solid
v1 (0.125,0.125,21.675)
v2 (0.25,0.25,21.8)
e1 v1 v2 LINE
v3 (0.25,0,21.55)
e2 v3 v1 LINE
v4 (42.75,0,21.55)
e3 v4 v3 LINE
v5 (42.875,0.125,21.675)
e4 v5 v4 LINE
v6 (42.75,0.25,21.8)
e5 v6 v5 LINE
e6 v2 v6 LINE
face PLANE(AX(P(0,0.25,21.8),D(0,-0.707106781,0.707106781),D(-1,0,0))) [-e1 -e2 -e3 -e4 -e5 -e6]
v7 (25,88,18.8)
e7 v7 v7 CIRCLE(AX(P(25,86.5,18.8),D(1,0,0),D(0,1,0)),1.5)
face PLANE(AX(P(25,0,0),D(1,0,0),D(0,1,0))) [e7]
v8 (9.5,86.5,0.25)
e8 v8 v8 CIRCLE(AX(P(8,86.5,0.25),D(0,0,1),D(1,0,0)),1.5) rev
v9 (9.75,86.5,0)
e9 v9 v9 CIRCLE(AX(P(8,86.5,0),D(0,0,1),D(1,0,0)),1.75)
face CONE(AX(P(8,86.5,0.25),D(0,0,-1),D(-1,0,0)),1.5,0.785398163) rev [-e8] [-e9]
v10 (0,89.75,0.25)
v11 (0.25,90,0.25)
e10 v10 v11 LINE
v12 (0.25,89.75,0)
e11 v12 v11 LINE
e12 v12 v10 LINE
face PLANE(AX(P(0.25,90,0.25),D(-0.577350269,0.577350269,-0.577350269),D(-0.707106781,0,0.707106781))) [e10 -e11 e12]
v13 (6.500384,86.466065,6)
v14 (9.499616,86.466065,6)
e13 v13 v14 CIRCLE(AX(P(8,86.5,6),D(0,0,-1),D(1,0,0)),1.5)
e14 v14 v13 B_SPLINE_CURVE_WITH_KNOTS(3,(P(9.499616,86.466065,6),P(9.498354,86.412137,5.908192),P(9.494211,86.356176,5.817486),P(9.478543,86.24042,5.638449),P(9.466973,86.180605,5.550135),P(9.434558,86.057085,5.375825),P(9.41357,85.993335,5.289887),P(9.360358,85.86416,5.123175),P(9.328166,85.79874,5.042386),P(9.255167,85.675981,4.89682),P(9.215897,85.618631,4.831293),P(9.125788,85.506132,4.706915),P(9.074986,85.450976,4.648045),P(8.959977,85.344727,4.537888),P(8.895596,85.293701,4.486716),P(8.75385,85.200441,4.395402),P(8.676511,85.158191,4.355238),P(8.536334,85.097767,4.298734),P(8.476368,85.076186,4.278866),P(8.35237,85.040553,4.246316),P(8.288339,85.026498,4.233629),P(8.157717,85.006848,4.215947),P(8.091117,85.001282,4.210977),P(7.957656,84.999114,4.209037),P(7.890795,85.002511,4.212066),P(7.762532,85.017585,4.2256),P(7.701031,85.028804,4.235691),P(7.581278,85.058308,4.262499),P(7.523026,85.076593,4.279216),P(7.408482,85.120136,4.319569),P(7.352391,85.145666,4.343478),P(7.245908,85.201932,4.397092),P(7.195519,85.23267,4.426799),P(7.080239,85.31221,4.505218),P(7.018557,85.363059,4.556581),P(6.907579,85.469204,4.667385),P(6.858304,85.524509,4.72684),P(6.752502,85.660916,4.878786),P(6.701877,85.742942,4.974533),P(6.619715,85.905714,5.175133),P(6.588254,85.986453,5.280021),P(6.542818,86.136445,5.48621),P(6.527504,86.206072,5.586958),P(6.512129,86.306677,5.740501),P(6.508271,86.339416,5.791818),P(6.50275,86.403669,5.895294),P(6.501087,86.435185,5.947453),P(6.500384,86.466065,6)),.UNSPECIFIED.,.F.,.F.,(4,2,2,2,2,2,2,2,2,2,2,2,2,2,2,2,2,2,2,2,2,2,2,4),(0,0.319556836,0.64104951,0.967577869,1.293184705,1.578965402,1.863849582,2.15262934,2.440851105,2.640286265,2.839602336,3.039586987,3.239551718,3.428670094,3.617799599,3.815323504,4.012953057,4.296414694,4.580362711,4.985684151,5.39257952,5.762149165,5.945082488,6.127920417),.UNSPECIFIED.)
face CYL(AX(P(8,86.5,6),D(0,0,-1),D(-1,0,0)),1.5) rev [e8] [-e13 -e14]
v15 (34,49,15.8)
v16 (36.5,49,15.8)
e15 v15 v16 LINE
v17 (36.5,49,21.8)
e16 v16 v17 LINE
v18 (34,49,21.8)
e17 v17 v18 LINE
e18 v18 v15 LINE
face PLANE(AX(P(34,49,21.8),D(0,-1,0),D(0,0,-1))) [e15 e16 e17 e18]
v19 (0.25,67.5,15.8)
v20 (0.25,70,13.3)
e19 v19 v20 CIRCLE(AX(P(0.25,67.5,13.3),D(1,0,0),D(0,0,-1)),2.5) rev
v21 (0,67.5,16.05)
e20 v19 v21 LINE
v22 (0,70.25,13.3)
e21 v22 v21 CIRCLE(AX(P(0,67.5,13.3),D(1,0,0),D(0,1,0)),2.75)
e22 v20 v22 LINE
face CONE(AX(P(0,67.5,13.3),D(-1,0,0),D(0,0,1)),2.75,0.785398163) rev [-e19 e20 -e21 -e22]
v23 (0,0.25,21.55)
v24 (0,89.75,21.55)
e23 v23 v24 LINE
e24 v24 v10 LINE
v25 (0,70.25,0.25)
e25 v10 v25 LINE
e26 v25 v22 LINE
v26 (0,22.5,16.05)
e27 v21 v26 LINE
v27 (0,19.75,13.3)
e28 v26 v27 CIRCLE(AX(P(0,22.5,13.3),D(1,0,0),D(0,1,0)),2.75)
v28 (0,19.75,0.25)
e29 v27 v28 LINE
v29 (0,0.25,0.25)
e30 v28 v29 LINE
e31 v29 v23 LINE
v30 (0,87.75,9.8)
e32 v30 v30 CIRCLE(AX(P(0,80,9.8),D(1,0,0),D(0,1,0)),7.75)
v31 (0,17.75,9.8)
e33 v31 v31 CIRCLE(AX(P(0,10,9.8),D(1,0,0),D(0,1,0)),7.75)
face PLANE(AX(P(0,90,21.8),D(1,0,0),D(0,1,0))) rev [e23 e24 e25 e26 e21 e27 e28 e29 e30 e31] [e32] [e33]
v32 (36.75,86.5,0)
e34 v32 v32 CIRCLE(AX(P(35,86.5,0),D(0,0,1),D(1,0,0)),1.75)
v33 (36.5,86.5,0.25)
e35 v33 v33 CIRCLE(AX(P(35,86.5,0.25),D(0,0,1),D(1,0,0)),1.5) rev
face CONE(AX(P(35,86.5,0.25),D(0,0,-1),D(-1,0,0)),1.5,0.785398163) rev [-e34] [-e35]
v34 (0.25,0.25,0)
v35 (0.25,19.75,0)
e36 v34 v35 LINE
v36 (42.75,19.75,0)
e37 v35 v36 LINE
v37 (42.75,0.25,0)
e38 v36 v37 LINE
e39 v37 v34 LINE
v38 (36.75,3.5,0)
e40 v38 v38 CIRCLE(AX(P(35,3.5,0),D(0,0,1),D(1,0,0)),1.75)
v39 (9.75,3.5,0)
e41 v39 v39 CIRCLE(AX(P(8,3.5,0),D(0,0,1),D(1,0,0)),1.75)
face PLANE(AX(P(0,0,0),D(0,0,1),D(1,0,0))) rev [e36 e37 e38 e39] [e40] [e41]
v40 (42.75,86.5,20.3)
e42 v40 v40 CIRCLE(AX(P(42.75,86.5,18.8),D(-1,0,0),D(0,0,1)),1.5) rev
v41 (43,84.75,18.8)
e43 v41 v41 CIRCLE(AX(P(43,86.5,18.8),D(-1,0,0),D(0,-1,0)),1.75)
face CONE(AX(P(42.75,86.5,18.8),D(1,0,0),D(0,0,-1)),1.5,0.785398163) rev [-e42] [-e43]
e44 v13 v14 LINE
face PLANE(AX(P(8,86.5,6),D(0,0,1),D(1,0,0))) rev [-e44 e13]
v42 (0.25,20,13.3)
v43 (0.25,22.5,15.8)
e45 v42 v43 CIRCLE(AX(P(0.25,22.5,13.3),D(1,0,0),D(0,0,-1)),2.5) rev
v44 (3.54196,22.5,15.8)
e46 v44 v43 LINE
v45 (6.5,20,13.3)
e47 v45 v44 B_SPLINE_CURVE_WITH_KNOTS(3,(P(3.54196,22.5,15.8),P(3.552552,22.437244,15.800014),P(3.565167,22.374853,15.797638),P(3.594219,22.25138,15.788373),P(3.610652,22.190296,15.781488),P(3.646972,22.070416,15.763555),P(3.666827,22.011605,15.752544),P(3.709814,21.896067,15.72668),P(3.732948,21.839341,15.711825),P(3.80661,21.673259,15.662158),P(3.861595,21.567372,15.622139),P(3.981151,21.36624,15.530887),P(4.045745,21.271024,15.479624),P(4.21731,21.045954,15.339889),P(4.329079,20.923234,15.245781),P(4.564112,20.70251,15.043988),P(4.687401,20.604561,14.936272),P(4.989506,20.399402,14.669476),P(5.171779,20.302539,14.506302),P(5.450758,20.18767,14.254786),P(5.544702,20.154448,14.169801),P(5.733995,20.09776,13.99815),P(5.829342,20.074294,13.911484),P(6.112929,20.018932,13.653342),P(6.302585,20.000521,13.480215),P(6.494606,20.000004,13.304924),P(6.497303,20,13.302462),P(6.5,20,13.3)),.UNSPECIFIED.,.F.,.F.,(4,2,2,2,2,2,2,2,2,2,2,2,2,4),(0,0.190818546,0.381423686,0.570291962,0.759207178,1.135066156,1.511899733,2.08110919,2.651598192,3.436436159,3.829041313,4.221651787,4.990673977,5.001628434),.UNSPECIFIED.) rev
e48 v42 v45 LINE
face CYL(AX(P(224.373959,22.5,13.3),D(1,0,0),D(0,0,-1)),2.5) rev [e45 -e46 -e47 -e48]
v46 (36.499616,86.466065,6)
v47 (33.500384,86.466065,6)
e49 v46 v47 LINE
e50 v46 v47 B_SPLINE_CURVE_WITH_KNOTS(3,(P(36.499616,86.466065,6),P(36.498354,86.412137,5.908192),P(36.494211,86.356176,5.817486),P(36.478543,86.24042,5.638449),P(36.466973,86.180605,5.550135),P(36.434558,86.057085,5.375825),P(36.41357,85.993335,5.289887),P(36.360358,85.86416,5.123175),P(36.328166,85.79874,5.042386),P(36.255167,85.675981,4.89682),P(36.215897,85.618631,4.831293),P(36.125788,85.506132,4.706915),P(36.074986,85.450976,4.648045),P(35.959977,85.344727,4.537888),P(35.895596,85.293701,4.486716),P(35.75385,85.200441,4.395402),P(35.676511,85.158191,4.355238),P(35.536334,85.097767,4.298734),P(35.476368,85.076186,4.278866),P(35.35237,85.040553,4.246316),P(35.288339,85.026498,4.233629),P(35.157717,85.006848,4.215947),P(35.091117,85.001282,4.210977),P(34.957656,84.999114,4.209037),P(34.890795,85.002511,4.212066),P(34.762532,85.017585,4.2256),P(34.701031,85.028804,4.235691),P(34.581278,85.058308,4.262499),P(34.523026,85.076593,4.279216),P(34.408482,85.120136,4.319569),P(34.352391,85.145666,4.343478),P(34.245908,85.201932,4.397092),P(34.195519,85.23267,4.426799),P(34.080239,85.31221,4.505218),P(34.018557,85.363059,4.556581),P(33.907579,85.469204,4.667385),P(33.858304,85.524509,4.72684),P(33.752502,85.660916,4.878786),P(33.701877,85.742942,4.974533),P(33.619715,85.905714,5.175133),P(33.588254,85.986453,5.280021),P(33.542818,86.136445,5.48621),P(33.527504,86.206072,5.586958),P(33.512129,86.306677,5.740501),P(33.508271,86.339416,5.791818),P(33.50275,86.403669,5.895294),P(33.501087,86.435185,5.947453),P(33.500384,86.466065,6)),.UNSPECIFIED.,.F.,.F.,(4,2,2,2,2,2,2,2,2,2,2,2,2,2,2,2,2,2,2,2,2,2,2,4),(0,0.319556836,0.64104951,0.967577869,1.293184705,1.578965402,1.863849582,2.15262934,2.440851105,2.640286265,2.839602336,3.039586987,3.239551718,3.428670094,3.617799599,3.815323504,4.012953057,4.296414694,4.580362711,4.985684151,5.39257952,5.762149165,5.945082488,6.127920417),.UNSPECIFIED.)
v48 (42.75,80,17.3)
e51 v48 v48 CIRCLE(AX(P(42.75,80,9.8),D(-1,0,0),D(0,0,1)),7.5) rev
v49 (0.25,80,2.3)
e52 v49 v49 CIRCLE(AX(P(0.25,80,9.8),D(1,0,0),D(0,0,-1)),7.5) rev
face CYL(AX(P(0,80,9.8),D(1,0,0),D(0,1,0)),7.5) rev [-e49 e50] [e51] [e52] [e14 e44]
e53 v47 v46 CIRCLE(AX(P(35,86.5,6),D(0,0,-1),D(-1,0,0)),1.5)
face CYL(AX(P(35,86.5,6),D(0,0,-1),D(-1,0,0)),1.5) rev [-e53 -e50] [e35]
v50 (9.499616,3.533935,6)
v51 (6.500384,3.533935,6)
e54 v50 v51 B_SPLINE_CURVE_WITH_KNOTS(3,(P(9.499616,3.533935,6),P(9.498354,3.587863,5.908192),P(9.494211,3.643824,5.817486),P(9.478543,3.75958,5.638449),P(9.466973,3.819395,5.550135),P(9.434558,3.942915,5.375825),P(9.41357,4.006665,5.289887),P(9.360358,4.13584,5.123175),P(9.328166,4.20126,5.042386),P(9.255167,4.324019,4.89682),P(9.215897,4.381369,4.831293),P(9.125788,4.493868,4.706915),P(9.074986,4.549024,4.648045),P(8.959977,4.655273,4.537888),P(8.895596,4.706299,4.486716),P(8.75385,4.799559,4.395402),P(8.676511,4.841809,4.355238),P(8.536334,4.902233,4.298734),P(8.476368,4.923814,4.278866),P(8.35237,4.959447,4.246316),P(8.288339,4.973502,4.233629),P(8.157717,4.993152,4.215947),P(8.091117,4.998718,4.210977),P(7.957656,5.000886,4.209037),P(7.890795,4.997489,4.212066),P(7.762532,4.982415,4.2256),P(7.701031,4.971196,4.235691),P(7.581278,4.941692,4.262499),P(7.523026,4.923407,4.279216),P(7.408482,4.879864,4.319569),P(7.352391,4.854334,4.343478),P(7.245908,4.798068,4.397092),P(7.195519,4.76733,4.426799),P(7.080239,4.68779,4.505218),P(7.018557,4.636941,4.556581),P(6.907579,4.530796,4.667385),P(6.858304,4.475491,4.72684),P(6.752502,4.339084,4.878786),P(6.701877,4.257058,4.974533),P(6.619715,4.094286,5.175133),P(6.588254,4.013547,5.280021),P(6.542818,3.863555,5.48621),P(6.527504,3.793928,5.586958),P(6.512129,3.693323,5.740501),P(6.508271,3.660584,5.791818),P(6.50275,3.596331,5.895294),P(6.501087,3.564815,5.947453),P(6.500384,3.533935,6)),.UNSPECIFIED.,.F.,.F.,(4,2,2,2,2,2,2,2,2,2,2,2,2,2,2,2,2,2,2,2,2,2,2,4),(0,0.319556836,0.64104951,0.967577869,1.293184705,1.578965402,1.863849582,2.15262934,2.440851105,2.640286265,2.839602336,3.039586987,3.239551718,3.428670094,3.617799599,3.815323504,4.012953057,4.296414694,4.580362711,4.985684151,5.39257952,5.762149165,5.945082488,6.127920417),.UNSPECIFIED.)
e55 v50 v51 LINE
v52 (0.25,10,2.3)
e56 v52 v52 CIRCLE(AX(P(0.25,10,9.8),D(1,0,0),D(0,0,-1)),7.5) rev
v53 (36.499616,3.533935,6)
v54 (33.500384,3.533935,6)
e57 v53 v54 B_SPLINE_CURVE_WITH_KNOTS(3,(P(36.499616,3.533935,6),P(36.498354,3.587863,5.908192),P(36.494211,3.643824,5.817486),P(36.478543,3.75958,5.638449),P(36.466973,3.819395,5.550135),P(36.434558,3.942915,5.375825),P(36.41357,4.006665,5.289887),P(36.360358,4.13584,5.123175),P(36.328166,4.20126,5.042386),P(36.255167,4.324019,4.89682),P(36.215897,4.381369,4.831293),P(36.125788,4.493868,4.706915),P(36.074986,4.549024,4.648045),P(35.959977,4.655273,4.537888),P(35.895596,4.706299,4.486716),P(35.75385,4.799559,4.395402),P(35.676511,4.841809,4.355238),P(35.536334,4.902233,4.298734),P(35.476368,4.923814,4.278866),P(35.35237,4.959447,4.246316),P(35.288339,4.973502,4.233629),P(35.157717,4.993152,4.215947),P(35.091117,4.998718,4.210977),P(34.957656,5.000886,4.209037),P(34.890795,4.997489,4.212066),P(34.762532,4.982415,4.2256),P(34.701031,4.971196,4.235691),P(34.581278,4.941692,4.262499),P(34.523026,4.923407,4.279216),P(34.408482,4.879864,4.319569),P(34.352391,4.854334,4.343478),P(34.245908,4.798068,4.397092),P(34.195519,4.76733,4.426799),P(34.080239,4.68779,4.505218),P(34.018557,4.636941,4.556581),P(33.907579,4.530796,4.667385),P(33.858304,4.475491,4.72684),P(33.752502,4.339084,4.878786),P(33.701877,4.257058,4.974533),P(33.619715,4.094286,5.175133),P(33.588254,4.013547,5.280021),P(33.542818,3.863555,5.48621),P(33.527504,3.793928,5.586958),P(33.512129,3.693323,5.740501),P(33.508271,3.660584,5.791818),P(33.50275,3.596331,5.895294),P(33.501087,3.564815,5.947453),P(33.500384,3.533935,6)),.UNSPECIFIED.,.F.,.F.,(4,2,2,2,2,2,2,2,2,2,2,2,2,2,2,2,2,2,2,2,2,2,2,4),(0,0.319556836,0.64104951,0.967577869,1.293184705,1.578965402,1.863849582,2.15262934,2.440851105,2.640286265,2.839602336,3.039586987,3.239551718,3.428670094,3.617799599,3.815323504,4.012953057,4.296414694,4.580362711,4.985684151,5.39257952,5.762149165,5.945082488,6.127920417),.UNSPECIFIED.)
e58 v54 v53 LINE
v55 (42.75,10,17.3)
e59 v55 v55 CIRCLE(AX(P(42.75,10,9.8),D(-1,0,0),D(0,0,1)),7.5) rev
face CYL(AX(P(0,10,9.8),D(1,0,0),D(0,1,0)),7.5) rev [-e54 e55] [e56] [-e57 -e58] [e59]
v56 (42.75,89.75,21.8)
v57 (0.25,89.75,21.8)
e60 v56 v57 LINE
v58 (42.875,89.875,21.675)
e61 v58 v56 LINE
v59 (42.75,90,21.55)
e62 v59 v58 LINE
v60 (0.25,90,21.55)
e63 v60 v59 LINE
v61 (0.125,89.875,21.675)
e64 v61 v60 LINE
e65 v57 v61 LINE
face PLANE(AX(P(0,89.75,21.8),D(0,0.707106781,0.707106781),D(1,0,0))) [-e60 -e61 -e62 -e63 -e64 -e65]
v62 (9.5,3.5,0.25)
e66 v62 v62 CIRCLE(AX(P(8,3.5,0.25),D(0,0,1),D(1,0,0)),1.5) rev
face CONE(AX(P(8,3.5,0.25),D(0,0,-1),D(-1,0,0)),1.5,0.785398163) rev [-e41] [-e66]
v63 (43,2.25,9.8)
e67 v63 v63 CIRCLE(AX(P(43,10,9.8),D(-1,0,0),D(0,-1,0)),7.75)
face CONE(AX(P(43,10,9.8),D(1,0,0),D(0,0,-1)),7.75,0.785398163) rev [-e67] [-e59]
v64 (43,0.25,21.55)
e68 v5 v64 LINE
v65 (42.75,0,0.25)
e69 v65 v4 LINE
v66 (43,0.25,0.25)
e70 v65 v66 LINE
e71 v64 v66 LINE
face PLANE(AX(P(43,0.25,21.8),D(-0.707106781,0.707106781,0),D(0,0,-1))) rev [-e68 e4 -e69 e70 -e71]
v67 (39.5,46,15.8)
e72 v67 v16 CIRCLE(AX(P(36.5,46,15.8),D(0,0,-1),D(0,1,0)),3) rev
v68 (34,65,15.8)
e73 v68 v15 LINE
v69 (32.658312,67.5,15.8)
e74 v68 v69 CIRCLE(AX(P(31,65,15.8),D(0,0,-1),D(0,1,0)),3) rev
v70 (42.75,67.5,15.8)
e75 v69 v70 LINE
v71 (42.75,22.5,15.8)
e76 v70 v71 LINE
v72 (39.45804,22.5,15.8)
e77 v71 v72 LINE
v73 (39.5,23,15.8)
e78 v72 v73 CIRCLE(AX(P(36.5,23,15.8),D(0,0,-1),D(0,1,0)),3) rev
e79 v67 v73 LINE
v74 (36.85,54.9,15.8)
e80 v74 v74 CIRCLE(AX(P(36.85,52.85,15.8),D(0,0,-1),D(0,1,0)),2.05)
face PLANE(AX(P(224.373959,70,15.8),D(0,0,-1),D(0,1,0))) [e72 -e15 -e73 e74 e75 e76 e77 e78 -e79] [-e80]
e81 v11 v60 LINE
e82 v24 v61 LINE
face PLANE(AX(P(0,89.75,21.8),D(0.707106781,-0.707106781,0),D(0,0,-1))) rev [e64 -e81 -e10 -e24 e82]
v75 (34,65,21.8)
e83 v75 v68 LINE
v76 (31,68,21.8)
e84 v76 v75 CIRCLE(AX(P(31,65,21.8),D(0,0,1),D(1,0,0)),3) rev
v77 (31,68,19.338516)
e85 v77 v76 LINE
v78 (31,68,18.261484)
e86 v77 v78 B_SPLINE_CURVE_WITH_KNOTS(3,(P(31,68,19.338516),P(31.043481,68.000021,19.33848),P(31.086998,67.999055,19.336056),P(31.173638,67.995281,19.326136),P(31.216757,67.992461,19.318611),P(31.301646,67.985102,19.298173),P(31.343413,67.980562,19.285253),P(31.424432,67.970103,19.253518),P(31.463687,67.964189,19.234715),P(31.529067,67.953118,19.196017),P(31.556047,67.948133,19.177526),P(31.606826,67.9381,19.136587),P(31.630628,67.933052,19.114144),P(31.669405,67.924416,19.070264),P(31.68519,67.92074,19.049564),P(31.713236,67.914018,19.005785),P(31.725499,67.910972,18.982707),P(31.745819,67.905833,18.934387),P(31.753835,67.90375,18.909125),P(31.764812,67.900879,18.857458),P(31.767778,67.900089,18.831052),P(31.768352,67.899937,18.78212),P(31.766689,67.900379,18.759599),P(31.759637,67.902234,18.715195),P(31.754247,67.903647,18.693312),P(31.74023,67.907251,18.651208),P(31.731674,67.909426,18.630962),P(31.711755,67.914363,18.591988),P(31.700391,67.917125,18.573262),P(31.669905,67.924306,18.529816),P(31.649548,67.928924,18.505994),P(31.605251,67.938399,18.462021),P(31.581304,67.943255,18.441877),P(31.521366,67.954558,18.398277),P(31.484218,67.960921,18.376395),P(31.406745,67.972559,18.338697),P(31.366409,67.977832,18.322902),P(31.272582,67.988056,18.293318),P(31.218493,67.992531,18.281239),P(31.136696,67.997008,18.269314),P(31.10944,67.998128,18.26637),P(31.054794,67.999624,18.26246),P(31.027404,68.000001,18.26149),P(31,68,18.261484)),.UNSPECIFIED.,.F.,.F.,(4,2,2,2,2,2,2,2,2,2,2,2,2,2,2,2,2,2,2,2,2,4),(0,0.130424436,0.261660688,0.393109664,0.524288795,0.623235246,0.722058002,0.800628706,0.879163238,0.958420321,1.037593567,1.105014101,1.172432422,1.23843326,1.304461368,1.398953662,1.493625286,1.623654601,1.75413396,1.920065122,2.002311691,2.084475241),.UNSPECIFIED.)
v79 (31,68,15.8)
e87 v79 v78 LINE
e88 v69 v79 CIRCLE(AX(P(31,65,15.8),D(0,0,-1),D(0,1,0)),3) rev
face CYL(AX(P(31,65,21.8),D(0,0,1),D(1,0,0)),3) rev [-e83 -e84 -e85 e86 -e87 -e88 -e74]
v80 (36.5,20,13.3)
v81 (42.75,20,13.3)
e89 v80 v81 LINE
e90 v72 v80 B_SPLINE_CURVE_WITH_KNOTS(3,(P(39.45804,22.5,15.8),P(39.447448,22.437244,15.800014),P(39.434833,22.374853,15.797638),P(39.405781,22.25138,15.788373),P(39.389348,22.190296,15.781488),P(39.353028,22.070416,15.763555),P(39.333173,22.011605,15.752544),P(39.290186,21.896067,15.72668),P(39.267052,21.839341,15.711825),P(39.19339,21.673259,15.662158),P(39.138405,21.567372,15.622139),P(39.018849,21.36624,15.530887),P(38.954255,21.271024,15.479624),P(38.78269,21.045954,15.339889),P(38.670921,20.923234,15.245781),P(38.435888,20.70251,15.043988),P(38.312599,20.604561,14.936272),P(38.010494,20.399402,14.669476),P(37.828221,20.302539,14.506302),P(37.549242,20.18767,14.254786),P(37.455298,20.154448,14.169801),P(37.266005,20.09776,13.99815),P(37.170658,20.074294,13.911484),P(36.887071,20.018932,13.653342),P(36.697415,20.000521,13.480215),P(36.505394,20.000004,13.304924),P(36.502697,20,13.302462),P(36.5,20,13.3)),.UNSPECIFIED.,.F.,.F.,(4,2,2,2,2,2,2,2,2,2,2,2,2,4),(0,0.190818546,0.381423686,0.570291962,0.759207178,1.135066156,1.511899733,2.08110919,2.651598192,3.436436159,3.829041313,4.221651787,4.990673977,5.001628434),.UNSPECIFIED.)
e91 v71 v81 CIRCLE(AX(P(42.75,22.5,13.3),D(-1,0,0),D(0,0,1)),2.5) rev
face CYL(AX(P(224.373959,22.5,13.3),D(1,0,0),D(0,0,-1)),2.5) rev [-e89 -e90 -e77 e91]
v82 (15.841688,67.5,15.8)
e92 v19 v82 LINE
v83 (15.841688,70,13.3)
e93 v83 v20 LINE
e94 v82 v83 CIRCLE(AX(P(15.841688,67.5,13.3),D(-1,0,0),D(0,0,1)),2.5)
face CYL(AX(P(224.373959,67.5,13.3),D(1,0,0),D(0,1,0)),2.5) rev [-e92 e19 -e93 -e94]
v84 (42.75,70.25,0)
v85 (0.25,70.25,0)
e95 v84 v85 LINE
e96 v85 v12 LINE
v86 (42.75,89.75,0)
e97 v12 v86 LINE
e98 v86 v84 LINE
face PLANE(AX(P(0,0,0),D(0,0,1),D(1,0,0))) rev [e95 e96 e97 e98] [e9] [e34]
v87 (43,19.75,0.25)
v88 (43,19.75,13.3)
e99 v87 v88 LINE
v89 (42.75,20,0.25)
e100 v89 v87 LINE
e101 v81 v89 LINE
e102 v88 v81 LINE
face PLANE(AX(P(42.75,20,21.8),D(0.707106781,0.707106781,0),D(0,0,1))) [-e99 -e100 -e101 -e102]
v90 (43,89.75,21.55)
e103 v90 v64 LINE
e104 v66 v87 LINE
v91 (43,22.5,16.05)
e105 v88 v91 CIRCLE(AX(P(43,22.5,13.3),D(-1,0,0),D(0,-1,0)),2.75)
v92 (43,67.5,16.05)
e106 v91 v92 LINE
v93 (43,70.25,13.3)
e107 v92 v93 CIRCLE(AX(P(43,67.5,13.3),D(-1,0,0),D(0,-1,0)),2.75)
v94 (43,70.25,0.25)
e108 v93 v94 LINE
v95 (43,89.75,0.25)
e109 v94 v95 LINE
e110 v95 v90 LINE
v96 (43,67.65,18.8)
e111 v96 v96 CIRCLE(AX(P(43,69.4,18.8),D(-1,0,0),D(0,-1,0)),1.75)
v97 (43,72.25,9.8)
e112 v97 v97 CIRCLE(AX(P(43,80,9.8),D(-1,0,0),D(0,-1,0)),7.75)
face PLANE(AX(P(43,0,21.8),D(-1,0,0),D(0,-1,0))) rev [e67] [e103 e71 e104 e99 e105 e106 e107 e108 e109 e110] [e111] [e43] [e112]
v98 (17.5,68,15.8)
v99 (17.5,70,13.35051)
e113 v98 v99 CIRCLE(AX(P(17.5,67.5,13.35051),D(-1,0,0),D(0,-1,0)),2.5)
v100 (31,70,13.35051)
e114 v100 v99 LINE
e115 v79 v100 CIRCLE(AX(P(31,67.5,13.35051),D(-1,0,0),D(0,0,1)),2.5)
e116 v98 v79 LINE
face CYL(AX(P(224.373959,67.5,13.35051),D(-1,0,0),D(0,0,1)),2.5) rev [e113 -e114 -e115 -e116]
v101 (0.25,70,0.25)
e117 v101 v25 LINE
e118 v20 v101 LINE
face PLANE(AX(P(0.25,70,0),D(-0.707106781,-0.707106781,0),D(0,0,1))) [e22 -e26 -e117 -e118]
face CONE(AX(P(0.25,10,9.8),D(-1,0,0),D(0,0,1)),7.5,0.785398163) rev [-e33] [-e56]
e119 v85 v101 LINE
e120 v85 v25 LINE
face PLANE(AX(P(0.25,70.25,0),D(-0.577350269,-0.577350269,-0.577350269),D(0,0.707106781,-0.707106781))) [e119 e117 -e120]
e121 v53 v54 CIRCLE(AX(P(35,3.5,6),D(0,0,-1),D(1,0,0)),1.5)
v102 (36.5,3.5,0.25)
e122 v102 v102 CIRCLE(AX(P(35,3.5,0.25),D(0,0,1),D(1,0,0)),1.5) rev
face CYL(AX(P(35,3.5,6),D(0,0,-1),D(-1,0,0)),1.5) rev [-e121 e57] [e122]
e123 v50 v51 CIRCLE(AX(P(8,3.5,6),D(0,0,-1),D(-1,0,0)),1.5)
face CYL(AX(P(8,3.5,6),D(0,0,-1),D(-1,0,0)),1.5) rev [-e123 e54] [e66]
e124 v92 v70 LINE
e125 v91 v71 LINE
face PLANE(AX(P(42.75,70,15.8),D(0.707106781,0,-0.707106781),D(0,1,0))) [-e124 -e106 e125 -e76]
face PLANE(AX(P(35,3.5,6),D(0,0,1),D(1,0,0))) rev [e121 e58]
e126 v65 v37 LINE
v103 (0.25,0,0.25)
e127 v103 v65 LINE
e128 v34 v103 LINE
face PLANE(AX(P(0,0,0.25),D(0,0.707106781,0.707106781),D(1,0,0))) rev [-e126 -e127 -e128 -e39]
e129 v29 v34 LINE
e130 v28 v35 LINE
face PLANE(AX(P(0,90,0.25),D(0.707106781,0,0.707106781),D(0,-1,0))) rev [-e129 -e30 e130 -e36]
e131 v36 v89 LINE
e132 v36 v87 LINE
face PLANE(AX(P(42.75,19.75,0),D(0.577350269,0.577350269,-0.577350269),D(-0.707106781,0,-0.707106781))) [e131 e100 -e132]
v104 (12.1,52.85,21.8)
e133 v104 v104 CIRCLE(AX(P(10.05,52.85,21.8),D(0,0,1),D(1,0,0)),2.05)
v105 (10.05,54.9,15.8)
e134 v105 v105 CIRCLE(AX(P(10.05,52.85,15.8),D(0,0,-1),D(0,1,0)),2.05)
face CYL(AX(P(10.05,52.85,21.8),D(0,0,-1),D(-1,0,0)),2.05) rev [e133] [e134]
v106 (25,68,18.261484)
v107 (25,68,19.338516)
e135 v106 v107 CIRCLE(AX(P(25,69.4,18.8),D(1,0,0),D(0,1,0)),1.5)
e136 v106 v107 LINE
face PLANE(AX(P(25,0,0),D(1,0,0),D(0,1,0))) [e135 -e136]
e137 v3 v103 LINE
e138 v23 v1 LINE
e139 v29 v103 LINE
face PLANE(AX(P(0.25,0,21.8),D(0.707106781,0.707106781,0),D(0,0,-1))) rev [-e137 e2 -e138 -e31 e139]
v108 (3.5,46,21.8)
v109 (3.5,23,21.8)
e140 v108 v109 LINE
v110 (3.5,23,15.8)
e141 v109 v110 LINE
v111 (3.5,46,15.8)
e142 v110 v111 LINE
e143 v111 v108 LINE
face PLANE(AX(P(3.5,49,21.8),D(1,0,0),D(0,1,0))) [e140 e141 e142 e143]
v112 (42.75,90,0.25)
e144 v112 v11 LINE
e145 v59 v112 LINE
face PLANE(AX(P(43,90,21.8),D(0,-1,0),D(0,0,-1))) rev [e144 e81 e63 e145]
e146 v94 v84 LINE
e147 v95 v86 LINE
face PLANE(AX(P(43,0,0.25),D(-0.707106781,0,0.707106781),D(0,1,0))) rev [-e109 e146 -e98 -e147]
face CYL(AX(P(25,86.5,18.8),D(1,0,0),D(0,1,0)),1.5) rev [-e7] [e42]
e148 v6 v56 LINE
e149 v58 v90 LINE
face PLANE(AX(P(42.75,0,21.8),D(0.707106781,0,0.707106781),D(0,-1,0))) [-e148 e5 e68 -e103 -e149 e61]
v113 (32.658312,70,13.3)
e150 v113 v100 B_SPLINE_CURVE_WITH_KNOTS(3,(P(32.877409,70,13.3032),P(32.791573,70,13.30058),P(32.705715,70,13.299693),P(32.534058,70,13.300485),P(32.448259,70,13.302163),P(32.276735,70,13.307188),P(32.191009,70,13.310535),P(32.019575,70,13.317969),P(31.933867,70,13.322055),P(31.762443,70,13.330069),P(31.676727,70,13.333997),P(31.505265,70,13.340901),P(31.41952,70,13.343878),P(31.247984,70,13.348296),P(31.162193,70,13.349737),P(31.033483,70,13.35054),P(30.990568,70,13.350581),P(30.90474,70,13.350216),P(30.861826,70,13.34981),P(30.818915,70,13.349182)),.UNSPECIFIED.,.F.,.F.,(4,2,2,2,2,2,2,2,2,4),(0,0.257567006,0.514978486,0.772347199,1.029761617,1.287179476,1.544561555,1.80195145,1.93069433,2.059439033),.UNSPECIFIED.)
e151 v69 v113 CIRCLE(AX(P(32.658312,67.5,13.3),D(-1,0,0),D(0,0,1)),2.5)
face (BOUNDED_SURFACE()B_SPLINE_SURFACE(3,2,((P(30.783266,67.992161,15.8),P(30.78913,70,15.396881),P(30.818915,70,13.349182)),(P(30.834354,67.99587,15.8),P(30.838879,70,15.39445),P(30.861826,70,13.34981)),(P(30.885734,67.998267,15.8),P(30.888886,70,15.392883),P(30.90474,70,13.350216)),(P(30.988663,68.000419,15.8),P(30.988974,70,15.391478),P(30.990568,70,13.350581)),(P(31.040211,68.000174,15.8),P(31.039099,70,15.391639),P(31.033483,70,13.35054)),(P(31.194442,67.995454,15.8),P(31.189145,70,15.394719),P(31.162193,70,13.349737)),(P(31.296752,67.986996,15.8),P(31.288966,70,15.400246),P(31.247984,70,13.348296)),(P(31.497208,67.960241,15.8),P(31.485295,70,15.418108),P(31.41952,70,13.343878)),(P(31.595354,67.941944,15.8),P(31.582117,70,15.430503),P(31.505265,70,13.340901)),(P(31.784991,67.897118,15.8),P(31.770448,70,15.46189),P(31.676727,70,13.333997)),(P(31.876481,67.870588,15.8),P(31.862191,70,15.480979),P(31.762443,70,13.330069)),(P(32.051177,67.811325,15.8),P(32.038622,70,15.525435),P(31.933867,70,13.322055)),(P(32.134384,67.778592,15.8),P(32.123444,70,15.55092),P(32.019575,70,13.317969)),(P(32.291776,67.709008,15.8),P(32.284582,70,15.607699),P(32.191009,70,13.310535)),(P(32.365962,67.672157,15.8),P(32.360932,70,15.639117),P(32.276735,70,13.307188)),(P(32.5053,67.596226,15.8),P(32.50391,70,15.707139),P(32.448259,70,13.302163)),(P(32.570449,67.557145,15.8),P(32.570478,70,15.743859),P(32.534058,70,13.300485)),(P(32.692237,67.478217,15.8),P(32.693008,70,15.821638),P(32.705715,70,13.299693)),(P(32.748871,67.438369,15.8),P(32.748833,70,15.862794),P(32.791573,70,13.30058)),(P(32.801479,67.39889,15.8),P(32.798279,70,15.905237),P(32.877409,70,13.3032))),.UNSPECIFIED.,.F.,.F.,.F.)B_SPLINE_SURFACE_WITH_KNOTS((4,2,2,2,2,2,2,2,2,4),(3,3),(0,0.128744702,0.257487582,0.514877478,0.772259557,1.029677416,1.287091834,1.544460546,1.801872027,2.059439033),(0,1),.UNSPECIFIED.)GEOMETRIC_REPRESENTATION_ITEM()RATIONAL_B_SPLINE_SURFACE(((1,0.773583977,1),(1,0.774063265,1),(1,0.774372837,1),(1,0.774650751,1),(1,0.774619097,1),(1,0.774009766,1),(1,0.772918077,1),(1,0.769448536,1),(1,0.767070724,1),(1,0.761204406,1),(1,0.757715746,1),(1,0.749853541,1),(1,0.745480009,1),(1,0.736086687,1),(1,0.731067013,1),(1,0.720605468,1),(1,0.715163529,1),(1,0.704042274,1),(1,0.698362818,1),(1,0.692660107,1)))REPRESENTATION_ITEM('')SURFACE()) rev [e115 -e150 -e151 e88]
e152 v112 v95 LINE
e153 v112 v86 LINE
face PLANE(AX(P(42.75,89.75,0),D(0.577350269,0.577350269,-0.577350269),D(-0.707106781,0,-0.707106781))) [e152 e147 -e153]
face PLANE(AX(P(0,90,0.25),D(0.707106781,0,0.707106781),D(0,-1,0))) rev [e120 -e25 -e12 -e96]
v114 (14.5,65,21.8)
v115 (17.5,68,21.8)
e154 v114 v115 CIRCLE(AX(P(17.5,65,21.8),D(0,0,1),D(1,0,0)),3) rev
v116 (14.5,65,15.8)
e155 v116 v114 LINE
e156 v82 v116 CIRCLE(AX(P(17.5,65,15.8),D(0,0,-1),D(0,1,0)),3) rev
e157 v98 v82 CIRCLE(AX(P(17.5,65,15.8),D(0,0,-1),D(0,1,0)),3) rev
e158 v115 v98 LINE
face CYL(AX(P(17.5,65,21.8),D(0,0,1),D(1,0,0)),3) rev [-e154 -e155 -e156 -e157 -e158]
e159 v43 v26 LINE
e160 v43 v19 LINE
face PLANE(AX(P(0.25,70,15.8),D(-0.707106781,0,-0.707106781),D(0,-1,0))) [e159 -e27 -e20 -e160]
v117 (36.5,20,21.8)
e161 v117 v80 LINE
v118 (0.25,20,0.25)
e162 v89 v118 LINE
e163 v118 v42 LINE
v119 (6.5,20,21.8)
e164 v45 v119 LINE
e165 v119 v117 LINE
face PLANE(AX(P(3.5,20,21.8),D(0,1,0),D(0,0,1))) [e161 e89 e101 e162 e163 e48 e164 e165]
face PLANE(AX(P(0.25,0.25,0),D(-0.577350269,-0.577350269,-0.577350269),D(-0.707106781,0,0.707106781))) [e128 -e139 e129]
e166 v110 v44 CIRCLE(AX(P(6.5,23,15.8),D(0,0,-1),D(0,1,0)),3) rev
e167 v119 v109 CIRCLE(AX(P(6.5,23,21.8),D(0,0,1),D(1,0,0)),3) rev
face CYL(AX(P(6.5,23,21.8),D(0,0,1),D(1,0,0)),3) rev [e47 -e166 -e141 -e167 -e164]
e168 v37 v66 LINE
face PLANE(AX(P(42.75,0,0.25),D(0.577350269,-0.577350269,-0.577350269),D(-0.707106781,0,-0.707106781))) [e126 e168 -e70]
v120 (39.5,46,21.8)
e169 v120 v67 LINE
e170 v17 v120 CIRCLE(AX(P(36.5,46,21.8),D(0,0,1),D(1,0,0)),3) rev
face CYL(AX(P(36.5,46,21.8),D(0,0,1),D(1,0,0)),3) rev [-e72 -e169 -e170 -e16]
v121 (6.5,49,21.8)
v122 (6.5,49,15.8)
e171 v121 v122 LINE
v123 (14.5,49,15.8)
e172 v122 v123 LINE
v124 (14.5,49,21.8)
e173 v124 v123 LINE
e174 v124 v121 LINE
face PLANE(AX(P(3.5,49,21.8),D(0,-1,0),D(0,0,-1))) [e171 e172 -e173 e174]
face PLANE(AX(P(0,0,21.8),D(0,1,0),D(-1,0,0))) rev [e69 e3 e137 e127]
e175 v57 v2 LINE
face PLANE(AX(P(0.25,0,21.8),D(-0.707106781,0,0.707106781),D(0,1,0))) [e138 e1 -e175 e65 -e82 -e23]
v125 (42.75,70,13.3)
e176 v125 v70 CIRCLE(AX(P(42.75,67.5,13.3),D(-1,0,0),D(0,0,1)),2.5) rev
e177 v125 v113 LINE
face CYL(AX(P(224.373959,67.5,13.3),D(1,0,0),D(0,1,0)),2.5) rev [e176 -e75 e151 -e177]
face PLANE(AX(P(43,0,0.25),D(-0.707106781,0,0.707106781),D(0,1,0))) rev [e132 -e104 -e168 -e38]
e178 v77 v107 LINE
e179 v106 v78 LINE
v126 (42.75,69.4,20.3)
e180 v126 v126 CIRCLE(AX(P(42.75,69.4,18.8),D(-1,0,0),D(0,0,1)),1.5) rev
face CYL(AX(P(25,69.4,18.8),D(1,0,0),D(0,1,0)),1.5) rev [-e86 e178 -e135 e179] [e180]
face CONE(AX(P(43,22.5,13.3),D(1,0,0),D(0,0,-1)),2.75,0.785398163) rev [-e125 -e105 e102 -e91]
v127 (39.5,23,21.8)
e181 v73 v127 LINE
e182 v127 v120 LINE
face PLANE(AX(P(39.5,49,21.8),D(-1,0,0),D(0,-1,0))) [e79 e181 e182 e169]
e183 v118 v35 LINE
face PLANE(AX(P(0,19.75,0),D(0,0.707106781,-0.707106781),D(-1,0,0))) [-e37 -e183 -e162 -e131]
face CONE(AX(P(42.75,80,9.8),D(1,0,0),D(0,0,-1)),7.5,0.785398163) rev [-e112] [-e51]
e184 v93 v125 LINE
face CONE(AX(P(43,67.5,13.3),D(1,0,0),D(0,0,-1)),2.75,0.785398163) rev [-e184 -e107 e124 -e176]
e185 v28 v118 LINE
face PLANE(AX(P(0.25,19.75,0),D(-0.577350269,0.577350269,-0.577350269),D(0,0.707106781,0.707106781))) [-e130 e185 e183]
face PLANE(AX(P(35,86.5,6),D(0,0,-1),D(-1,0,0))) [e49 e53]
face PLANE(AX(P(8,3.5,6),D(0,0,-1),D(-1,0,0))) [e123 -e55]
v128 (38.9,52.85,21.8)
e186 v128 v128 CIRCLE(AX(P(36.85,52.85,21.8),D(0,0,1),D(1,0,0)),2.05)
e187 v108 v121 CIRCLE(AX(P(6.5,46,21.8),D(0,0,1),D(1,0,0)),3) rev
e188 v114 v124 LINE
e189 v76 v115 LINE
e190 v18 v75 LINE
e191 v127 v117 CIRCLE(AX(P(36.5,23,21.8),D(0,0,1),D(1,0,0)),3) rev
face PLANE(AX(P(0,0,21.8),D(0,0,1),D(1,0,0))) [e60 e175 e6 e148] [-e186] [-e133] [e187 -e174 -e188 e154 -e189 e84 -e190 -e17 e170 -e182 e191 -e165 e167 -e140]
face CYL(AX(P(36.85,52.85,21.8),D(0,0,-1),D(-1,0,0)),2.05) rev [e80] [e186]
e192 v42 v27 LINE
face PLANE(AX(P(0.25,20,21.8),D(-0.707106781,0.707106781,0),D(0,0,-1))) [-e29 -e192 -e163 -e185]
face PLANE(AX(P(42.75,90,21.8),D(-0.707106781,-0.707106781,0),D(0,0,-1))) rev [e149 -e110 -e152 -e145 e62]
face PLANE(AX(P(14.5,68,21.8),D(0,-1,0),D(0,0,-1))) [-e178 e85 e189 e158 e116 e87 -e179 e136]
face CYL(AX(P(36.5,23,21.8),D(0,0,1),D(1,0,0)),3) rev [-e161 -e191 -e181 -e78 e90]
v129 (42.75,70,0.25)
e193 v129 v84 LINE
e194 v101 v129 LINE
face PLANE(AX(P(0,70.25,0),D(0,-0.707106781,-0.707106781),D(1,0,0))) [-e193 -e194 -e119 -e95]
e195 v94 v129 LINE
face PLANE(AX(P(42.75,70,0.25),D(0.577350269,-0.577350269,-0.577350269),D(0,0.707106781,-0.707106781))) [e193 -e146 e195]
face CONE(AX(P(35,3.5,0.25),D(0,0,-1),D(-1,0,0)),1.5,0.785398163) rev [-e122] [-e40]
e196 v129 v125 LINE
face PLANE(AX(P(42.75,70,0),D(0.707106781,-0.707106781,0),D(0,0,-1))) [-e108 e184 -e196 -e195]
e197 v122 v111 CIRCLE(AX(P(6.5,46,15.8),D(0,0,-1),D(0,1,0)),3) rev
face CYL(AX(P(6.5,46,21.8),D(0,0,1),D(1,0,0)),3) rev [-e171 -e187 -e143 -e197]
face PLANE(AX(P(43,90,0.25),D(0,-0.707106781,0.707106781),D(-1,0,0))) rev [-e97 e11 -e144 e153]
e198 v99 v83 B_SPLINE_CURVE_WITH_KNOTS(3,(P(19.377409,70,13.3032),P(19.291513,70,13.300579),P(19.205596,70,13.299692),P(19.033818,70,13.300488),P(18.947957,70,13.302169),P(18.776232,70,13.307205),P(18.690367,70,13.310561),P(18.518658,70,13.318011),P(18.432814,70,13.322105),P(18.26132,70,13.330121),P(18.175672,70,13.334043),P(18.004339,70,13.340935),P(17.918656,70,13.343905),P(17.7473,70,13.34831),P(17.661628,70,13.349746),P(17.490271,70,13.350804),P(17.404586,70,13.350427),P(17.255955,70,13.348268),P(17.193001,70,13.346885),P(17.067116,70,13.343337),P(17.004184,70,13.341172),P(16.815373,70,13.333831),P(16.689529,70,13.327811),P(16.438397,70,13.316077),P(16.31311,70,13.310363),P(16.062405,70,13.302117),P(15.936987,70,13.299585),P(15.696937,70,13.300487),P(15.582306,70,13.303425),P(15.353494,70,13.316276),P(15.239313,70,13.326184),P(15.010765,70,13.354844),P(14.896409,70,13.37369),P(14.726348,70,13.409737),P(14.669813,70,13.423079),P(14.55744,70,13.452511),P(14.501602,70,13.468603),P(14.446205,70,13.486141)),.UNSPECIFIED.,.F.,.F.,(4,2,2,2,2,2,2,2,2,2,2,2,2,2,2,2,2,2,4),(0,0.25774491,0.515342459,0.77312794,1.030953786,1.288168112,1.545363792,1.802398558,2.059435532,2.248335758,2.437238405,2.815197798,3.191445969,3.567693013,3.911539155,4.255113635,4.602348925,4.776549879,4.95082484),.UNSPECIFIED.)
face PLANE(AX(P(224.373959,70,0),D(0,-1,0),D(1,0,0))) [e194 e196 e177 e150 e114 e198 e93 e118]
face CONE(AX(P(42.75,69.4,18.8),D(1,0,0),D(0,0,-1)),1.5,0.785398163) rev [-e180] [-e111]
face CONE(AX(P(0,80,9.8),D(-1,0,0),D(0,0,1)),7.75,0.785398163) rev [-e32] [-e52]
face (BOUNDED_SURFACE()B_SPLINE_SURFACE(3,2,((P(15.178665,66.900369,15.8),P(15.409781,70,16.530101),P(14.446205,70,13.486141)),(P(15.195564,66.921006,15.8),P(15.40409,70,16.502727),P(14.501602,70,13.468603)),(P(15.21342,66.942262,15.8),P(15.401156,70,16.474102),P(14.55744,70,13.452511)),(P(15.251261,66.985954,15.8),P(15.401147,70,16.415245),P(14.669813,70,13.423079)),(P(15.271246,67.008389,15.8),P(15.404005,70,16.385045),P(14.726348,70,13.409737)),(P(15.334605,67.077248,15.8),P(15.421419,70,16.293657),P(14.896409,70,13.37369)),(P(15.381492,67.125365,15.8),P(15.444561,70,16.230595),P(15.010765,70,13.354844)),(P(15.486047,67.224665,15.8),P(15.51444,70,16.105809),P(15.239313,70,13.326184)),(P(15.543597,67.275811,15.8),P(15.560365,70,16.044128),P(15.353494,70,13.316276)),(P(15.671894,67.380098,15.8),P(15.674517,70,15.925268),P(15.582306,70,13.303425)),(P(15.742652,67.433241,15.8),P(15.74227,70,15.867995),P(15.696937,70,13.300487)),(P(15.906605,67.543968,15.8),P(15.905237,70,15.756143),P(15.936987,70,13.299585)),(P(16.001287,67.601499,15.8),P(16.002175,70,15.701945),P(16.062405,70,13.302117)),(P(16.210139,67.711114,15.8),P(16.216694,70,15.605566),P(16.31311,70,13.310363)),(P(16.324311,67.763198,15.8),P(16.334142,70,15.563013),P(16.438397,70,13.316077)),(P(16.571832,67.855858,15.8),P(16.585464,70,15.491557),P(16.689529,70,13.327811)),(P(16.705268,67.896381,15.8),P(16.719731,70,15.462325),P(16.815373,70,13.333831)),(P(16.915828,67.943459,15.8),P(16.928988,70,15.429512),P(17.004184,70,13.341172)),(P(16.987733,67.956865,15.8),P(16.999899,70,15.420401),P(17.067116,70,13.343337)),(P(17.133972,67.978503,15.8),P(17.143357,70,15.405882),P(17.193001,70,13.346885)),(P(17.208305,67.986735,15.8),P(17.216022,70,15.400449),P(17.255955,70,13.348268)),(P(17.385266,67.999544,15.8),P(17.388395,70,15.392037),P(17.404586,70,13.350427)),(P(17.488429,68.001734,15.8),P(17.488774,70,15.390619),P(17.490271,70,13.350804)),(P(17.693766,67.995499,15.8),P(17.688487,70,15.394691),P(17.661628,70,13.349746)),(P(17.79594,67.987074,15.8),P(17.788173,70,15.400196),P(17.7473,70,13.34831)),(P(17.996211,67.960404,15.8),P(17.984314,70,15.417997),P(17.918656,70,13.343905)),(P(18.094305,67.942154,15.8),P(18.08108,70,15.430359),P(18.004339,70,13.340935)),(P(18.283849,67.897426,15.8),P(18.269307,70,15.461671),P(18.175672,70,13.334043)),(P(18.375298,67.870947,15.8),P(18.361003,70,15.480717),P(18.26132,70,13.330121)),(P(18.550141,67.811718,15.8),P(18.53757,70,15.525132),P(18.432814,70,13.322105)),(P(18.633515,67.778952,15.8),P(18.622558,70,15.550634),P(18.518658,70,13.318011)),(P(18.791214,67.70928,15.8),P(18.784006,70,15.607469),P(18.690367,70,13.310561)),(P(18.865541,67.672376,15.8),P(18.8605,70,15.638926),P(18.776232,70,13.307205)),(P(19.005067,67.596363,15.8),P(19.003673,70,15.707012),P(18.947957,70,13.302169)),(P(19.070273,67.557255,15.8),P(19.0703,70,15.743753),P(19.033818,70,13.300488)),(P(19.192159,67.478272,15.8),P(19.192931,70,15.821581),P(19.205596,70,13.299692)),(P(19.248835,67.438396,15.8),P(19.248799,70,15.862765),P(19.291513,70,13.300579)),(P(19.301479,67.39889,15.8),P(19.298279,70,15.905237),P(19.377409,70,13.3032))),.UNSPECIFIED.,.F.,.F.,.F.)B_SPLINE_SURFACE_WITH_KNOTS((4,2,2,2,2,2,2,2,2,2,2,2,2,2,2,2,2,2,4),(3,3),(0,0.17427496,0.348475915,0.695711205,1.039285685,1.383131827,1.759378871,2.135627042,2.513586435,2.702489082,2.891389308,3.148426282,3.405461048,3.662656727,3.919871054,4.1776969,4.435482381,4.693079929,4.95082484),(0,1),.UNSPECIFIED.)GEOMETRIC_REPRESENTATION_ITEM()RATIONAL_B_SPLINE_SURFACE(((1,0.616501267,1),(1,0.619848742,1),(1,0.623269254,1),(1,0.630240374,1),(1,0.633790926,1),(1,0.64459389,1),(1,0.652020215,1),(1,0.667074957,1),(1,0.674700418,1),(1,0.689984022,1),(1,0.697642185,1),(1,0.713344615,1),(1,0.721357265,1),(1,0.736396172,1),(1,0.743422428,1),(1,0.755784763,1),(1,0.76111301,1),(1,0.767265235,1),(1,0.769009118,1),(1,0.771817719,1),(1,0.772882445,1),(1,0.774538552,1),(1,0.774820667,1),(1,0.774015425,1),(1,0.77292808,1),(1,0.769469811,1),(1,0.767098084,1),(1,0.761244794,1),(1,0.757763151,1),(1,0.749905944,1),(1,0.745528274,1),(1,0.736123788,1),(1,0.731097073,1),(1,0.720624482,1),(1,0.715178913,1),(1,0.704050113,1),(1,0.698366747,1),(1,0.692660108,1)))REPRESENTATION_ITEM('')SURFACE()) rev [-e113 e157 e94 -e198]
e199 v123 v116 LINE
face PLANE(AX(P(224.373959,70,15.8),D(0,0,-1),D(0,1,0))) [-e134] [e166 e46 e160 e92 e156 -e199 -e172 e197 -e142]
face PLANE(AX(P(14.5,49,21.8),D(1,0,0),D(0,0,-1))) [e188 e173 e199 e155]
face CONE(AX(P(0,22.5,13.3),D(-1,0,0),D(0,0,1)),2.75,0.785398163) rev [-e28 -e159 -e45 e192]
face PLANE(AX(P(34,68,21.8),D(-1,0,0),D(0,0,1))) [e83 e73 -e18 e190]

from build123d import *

# Parameters (mm, degrees)
MODEL_W                  = 43
MODEL_H                  = 90
MODEL_R                  = 2.05
EXTRUDE_1_DEPTH          = 21.8
FILLET_1_R               = 3
CUT_EXTRUDE_1_DEPTH      = 103.099167479
CUT_EXTRUDE_1_DEPTH_BACK = 103.099167479
FILLET_2_R               = 2.5
SKETCH_3_R               = 7.5
CUT_EXTRUDE_2_DEPTH      = 103.099167543
SKETCH_3_6_R             = 1.5
CUT_EXTRUDE_5_DEPTH      = 18
SKETCH_8_R               = 1.5
CUT_EXTRUDE_7_DEPTH      = 6
CHAMFER_3_SIZE           = 0.25
CHAMFER_4_SIZE           = 0.25


with BuildPart() as part:
    # Model → Бобышка-Вытянуть1 (new body)
    with BuildSketch(Plane.XY):
        with Locations((21.5, 45)):
            Rectangle(MODEL_W, MODEL_H)
        with Locations((10.05, 52.85)):
            Circle(MODEL_R, mode=Mode.SUBTRACT)
        with Locations((36.85, 52.85)):
            Circle(MODEL_R, mode=Mode.SUBTRACT)
        Polygon((14.5, 49), (14.5, 68), (34, 68), (34, 49), (39.5, 49), (39.5, 20), (3.5, 20), (3.5, 49), align=None, mode=Mode.SUBTRACT)
    extrude(amount=EXTRUDE_1_DEPTH)

    # Скругление1
    fillet_1_edges = [part.edges().sort_by_distance(p)[0] for p in [
        (3.5, 49, 10.9),
        (3.5, 20, 10.9),
        (39.5, 20, 10.9),
        (39.5, 49, 10.9),
        (34, 68, 10.9),
        (14.5, 68, 10.9),
    ]]
    fillet(fillet_1_edges, radius=FILLET_1_R)

    # Эскиз2 → Вырез-Вытянуть1 (cut, two sides: drawn at the far end of the back side and taken through both)
    with BuildSketch(Plane(origin=(43, 0, 0), x_dir=(0, 0, -1), z_dir=(1, 0, 0)).offset(-CUT_EXTRUDE_1_DEPTH_BACK)):
        Polygon((156.632056522, 70), (0, 70), (-15.8, 70), (-15.8, 20), (0, 20), (156.632056522, 20), (469.896169567, 20), (469.896169567, 70), align=None)
    extrude(amount=CUT_EXTRUDE_1_DEPTH + CUT_EXTRUDE_1_DEPTH_BACK, mode=Mode.SUBTRACT)

    # Скругление2
    fillet_2_edges = [part.edges().sort_by_distance(p)[0] for p in [
        (21.5, 70, 15.8),
        (3.25, 20, 15.8),
        (39.75, 20, 15.8),
    ]]
    fillet(fillet_2_edges, radius=FILLET_2_R - 0.0001)  # a hair under: the kernel refuses the full size

    # Эскиз3 → Вырез-Вытянуть2 (cut, through all)
    with BuildSketch(Plane(origin=(43, 0, 0), x_dir=(0, 0, -1), z_dir=(1, 0, 0))):
        with Locations(Location((-9.8, 80, 0), (0, 0, 90))):
            Circle(SKETCH_3_R)
        with Locations(Location((-9.8, 10, 0), (0, 0, 90))):
            Circle(SKETCH_3_R)
    extrude(amount=-CUT_EXTRUDE_2_DEPTH, mode=Mode.SUBTRACT)

    # Эскиз3<6> → Вырез-Вытянуть5 (cut)
    with BuildSketch(Plane(origin=(43, 0, 0), x_dir=(0, 0, -1), z_dir=(1, 0, 0))):
        with Locations(Location((-18.8, 86.5, 0), (0, 0, 90))):
            Circle(SKETCH_3_6_R)
        with Locations(Location((-18.8, 69.4, 0), (0, 0, 90))):
            Circle(SKETCH_3_6_R)
    extrude(amount=-CUT_EXTRUDE_5_DEPTH, mode=Mode.SUBTRACT)

    # Эскиз8 → Вырез-Вытянуть7 (cut)
    with BuildSketch(Plane(origin=(0, 0, 0), x_dir=(-1, 0, 0), z_dir=(0, 0, -1))):
        with Locations((-35, 86.5)):
            Circle(SKETCH_8_R)
        with Locations(Location((-8, 86.5, 0), (0, 0, 358.703677977))):
            Circle(SKETCH_8_R)
        with Locations((-8, 3.5)):
            Circle(SKETCH_8_R)
        with Locations(Location((-35, 3.5, 0), (0, 0, 1.296322023))):
            Circle(SKETCH_8_R)
    extrude(amount=-CUT_EXTRUDE_7_DEPTH, mode=Mode.SUBTRACT)

    # Фаска3
    chamfer_3_edges = [part.edges().sort_by_distance(p)[0] for p in [
        (43, 80, 0),
        (43, 70, 6.65005),
        (0, 10, 0),
        (0, 20, 6.65005),
        (21.5, 70, 0),
        (0, 70, 6.65005),
        (43, 45, 21.8),
        (0, 45, 15.8),
        (43, 45, 15.8),
        (43, 20, 6.65005),
        (0, 69.267796242, 15.067796242),
        (43, 69.267796242, 15.067796242),
        (43, 20.732203758, 15.067796242),
        (0, 20.732203758, 15.067796242),
        (43, 2.5, 9.8),
        (0, 2.5, 9.8),
        (0, 72.5, 9.8),
        (43, 72.5, 9.8),
        (43, 85, 18.8),
        (43, 67.9, 18.8),
        (36.5, 86.5, 0),
        (9.499616095, 86.533934736, 0),
        (9.5, 3.5, 0),
        (36.499616095, 3.466065264, 0),
        (43, 10, 0),
        (21.5, 0, 0),
        (21.5, 20, 0),
        (0, 80, 0),
        (21.5, 90, 0),
        (0, 45, 21.8),
        (43, 90, 10.9),
        (43, 0, 10.9),
        (0, 0, 10.9),
        (0, 90, 10.9),
    ]]
    chamfer(chamfer_3_edges, length=CHAMFER_3_SIZE)

    # Фаска4
    chamfer_4_edges = [part.edges().sort_by_distance(p)[0] for p in [
        (21.5, 90, 21.8),
        (21.5, 0, 21.8),
    ]]
    chamfer(chamfer_4_edges, length=CHAMFER_4_SIZE)


solid = part.part
